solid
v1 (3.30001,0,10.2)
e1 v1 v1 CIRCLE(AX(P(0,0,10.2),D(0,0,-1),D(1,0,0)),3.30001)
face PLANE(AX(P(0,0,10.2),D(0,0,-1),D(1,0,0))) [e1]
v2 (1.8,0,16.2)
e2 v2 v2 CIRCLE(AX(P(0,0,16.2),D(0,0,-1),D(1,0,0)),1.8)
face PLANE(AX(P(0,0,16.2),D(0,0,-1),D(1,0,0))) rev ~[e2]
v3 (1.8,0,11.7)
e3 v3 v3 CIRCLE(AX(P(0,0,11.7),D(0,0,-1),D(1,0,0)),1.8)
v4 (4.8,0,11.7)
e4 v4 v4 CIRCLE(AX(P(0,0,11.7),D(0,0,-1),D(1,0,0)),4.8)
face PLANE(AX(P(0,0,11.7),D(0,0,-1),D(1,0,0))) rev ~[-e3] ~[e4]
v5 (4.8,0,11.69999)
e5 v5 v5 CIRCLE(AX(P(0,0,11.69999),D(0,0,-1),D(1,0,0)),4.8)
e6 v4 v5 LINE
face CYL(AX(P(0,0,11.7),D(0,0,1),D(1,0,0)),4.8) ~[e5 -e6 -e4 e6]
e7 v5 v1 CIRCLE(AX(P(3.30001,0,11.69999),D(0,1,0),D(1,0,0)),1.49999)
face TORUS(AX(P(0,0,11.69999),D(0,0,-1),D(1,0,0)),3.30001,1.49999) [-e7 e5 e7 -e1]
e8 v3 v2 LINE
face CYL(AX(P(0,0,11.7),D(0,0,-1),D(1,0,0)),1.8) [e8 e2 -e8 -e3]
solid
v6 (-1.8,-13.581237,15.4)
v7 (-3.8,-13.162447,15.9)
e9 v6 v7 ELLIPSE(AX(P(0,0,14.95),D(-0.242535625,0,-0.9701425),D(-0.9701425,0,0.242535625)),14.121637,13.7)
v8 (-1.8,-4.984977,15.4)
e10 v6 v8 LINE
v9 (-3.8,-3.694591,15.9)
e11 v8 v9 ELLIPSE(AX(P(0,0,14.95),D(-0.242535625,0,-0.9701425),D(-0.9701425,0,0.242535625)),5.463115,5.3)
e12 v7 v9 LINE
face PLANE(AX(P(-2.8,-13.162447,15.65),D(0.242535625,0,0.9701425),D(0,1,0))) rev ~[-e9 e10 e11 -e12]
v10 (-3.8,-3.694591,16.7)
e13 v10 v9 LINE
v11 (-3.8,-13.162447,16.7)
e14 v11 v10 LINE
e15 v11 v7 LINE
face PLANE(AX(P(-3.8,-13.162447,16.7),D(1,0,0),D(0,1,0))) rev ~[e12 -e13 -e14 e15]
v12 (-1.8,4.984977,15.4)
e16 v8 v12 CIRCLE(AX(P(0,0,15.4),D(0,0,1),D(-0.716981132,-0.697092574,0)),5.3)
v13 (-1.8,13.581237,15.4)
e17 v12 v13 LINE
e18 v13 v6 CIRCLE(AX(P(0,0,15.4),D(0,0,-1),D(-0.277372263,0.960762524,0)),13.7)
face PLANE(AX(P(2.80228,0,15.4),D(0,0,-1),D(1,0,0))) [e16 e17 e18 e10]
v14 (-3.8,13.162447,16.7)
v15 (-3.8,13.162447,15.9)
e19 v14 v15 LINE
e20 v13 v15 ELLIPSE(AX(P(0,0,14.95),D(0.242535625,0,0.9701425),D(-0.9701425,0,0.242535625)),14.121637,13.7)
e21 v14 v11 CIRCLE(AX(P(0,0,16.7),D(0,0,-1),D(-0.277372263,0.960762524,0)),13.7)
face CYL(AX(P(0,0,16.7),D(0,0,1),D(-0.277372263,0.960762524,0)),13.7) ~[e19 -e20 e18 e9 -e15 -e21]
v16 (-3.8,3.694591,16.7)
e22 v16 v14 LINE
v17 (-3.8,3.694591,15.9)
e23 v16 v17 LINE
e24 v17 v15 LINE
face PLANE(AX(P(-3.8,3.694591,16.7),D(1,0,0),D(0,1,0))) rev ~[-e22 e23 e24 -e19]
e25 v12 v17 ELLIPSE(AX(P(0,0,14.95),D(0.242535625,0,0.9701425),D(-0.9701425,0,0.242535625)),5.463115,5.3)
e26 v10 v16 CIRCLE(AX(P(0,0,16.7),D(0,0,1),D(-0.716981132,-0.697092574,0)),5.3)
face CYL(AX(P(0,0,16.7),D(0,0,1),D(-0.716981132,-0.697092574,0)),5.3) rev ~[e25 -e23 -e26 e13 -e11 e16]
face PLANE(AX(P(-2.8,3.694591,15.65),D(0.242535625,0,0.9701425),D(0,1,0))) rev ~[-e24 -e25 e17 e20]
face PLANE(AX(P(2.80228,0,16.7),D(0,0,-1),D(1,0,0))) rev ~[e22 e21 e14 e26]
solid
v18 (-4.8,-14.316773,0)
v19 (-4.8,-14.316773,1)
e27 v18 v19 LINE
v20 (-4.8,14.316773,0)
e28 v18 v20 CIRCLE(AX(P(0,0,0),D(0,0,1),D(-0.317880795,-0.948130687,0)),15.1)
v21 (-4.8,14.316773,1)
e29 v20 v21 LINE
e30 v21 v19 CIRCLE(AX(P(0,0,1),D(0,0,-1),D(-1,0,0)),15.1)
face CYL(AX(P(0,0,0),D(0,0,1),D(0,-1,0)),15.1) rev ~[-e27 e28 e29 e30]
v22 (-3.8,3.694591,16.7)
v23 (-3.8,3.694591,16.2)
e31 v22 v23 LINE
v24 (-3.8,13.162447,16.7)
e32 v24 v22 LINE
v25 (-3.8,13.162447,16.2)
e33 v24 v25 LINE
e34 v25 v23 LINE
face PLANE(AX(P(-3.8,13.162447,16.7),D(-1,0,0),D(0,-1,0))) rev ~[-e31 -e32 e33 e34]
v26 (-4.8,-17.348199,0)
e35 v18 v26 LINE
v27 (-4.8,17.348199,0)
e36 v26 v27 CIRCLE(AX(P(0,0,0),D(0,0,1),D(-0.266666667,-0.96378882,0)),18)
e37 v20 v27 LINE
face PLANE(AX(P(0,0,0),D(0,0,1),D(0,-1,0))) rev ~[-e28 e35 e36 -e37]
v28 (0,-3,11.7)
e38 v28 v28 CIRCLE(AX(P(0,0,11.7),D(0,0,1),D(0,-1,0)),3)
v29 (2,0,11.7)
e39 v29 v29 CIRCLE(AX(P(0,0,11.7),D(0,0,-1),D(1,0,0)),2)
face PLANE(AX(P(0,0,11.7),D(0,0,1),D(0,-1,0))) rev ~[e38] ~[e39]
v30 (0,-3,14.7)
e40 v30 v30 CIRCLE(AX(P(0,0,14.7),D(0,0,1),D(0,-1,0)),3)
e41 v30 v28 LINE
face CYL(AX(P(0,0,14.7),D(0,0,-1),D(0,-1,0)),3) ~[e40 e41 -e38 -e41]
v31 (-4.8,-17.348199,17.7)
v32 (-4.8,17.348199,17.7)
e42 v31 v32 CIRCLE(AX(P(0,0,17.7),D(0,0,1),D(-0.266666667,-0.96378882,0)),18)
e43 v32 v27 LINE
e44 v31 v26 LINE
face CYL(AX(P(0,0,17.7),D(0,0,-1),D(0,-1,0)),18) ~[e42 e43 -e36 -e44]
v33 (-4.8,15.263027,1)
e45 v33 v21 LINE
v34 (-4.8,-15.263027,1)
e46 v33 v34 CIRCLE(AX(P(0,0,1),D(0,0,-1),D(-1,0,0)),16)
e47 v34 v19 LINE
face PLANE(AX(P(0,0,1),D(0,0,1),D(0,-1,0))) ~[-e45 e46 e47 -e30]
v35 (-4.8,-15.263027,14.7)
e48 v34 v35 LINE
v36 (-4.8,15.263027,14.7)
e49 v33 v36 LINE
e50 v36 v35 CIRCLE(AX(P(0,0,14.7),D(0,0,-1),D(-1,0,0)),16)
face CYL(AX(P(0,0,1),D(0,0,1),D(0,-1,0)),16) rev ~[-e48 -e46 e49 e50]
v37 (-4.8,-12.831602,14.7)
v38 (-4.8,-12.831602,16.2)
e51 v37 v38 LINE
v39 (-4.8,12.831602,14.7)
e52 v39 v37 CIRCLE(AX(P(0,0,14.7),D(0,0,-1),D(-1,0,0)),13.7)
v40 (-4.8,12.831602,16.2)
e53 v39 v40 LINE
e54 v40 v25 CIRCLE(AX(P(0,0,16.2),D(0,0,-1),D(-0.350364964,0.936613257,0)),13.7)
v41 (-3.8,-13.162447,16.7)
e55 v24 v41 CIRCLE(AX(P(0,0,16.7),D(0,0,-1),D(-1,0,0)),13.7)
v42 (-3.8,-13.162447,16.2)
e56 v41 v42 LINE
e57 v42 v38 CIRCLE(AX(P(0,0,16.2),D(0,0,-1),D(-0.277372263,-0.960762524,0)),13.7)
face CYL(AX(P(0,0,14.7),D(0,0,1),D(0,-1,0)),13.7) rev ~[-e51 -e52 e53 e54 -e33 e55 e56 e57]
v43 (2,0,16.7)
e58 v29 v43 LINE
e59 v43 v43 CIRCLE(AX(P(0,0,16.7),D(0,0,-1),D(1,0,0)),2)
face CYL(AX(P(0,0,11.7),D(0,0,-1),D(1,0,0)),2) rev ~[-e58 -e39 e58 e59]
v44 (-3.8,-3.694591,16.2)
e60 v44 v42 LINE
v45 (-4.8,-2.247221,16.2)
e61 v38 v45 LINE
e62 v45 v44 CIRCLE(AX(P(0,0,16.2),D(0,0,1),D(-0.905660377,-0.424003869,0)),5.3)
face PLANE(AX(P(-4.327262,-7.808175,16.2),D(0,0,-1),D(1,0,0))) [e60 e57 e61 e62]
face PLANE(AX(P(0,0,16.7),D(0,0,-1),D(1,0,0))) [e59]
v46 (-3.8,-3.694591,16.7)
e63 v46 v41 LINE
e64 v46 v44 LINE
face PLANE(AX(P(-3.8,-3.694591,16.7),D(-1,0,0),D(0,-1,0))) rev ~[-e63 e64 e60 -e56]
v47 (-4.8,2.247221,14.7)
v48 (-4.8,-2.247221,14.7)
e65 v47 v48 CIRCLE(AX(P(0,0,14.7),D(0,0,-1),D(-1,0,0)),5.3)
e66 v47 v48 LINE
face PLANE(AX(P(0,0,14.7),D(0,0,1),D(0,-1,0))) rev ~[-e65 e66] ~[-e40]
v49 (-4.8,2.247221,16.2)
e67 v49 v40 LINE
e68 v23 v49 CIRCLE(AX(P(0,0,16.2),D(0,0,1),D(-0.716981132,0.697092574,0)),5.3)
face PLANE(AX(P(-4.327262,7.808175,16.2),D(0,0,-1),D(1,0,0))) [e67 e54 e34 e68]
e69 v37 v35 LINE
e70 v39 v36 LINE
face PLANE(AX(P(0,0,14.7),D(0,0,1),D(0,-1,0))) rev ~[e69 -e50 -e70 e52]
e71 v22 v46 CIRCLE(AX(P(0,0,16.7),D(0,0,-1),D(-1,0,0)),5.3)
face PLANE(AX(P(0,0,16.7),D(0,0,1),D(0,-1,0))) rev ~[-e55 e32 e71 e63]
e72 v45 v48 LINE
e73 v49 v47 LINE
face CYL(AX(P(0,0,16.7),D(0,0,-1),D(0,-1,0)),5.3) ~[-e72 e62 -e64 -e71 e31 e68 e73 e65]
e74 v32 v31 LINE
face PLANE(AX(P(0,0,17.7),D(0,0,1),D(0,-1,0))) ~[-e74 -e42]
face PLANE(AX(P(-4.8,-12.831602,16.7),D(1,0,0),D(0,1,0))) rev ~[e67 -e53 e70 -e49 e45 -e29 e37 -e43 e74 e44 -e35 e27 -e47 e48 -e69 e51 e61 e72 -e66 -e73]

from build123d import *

# Parameters (mm, degrees)
F2_W          = 13.2
F2_H          = 17.7
F3_DEPTH      = 25
F3_DEPTH_BACK = 25
F5_DEPTH      = 0.5
F6_R          = 2
F7_DEPTH      = 5
F8_R          = 1.8
F9_DEPTH      = 4.5
F10_R         = 4.8
F10_R_2       = 1.8
F11_DEPTH     = 1.5
F12_R         = 1.49999
F14_DEPTH     = 1.3
F15_SIZE2     = 0.5
F15_SIZE      = 2


# Not quite as in the source:
# - a fillet or chamfer is up to 0.001 mm smaller than in the source, because OpenCascade refuses the exact size


with BuildPart() as f1:
    # F0 (on Right) → F1 (revolve)
    with BuildSketch(Plane.YZ):
        Polygon((0, 11.7), (0, 17.7), (-18, 17.7), (-18, 0), (-15.1, 0), (-15.1, 1), (-16, 1), (-16, 14.7), (-13.7, 14.7), (-13.7, 16.7), (-5.3, 16.7), (-5.3, 14.7), (-3, 14.7), (-3, 11.7), align=None)
    revolve(axis=Axis((0, 0, 39.4193158346), (0, 0, 1)))

    # F2 (on Front) → F3 (cut, two sides)
    with BuildSketch(Plane.XZ) as f3_sk:
        with Locations((-11.4, 8.85)):
            Rectangle(F2_W, F2_H)
    extrude(amount=F3_DEPTH, mode=Mode.SUBTRACT)
    extrude(f3_sk.sketch, amount=-F3_DEPTH_BACK, mode=Mode.SUBTRACT)

    # F4 (on face) → F5 (join)
    with BuildSketch(Plane(origin=(0, 0, 16.7), x_dir=(1, 0, 0), z_dir=(0, 0, -1))):
        with BuildLine():
            ThreePointArc((-3.8, 13.1624465811), (-4.3031807536, 13.0066381284), (-4.8, 12.8316016148))
            Line((-4.8, 12.8316016148), (-4.8, 2.2472205054))
            ThreePointArc((-4.8, 2.2472205054), (-4.3604724603, 3.012686496), (-3.8, 3.6945906404))
            Line((-3.8, 3.6945906404), (-3.8, 13.1624465811))
        make_face()
        with BuildLine():
            ThreePointArc((-4.8, -12.8316016148), (-4.3031807536, -13.0066381284), (-3.8, -13.1624465811))
            Line((-3.8, -13.1624465811), (-3.8, -3.6945906404))
            ThreePointArc((-3.8, -3.6945906404), (-4.3604724603, -3.012686496), (-4.8, -2.2472205054))
            Line((-4.8, -2.2472205054), (-4.8, -12.8316016148))
        make_face()
    extrude(amount=F5_DEPTH)

    # F6 (on face) → F7 (cut)
    with BuildSketch(Plane(origin=(0, 0, 11.7), x_dir=(1, 0, 0), z_dir=(0, 0, -1))):
        Circle(F6_R)
    extrude(amount=-F7_DEPTH, mode=Mode.SUBTRACT)


with BuildPart() as f9:
    # F8 (on face) → F9 (new body)
    with BuildSketch(Plane(origin=(0, 0, 11.7), x_dir=(1, 0, 0), z_dir=(0, 0, -1))):
        Circle(F8_R)
    extrude(amount=-F9_DEPTH)

    # F10 (on face) → F11 (join)
    with BuildSketch(Plane(origin=(0, 0, 11.7), x_dir=(1, 0, 0), z_dir=(0, 0, -1))):
        Circle(F10_R)
        Circle(F10_R_2, mode=Mode.SUBTRACT)
        Circle(F10_R_2)
    extrude(amount=F11_DEPTH)

    # F12 (radius 1.5 in the source; OpenCascade refuses exactly that, so slightly less here)
    f12_edges = [f9.edges().sort_by_distance(p)[0] for p in [
        (-4.8, 0, 10.2),
    ]]
    fillet(f12_edges, radius=F12_R)


with BuildPart() as f14:
    # F13 (on face) → F14 (new body)
    with BuildSketch(Plane(origin=(0, 0, 16.7), x_dir=(1, 0, 0), z_dir=(0, 0, -1))):
        with BuildLine():
            Line((-3.8, -3.6945906404), (-3.8, -13.1624465811))
            ThreePointArc((-3.8, -13.1624465811), (13.7, 0), (-3.8, 13.1624465811))
            Line((-3.8, 13.1624465811), (-3.8, 3.6945906404))
            ThreePointArc((-3.8, 3.6945906404), (5.3, 0), (-3.8, -3.6945906404))
        make_face()
    extrude(amount=F14_DEPTH)

    # F15
    f15_edges = [f14.edges().sort_by_distance(p)[0] for p in [
        (-3.8, 8.428519, 15.4),
        (-3.8, -8.428519, 15.4),
    ]]
    f15_side = f14.faces().sort_by_distance((-3.474883, -8.428519, 15.4))[0]
    chamfer(f15_edges, length=F15_SIZE, length2=F15_SIZE2, reference=f15_side)


solid = Compound([f1.part, f9.part, f14.part])
